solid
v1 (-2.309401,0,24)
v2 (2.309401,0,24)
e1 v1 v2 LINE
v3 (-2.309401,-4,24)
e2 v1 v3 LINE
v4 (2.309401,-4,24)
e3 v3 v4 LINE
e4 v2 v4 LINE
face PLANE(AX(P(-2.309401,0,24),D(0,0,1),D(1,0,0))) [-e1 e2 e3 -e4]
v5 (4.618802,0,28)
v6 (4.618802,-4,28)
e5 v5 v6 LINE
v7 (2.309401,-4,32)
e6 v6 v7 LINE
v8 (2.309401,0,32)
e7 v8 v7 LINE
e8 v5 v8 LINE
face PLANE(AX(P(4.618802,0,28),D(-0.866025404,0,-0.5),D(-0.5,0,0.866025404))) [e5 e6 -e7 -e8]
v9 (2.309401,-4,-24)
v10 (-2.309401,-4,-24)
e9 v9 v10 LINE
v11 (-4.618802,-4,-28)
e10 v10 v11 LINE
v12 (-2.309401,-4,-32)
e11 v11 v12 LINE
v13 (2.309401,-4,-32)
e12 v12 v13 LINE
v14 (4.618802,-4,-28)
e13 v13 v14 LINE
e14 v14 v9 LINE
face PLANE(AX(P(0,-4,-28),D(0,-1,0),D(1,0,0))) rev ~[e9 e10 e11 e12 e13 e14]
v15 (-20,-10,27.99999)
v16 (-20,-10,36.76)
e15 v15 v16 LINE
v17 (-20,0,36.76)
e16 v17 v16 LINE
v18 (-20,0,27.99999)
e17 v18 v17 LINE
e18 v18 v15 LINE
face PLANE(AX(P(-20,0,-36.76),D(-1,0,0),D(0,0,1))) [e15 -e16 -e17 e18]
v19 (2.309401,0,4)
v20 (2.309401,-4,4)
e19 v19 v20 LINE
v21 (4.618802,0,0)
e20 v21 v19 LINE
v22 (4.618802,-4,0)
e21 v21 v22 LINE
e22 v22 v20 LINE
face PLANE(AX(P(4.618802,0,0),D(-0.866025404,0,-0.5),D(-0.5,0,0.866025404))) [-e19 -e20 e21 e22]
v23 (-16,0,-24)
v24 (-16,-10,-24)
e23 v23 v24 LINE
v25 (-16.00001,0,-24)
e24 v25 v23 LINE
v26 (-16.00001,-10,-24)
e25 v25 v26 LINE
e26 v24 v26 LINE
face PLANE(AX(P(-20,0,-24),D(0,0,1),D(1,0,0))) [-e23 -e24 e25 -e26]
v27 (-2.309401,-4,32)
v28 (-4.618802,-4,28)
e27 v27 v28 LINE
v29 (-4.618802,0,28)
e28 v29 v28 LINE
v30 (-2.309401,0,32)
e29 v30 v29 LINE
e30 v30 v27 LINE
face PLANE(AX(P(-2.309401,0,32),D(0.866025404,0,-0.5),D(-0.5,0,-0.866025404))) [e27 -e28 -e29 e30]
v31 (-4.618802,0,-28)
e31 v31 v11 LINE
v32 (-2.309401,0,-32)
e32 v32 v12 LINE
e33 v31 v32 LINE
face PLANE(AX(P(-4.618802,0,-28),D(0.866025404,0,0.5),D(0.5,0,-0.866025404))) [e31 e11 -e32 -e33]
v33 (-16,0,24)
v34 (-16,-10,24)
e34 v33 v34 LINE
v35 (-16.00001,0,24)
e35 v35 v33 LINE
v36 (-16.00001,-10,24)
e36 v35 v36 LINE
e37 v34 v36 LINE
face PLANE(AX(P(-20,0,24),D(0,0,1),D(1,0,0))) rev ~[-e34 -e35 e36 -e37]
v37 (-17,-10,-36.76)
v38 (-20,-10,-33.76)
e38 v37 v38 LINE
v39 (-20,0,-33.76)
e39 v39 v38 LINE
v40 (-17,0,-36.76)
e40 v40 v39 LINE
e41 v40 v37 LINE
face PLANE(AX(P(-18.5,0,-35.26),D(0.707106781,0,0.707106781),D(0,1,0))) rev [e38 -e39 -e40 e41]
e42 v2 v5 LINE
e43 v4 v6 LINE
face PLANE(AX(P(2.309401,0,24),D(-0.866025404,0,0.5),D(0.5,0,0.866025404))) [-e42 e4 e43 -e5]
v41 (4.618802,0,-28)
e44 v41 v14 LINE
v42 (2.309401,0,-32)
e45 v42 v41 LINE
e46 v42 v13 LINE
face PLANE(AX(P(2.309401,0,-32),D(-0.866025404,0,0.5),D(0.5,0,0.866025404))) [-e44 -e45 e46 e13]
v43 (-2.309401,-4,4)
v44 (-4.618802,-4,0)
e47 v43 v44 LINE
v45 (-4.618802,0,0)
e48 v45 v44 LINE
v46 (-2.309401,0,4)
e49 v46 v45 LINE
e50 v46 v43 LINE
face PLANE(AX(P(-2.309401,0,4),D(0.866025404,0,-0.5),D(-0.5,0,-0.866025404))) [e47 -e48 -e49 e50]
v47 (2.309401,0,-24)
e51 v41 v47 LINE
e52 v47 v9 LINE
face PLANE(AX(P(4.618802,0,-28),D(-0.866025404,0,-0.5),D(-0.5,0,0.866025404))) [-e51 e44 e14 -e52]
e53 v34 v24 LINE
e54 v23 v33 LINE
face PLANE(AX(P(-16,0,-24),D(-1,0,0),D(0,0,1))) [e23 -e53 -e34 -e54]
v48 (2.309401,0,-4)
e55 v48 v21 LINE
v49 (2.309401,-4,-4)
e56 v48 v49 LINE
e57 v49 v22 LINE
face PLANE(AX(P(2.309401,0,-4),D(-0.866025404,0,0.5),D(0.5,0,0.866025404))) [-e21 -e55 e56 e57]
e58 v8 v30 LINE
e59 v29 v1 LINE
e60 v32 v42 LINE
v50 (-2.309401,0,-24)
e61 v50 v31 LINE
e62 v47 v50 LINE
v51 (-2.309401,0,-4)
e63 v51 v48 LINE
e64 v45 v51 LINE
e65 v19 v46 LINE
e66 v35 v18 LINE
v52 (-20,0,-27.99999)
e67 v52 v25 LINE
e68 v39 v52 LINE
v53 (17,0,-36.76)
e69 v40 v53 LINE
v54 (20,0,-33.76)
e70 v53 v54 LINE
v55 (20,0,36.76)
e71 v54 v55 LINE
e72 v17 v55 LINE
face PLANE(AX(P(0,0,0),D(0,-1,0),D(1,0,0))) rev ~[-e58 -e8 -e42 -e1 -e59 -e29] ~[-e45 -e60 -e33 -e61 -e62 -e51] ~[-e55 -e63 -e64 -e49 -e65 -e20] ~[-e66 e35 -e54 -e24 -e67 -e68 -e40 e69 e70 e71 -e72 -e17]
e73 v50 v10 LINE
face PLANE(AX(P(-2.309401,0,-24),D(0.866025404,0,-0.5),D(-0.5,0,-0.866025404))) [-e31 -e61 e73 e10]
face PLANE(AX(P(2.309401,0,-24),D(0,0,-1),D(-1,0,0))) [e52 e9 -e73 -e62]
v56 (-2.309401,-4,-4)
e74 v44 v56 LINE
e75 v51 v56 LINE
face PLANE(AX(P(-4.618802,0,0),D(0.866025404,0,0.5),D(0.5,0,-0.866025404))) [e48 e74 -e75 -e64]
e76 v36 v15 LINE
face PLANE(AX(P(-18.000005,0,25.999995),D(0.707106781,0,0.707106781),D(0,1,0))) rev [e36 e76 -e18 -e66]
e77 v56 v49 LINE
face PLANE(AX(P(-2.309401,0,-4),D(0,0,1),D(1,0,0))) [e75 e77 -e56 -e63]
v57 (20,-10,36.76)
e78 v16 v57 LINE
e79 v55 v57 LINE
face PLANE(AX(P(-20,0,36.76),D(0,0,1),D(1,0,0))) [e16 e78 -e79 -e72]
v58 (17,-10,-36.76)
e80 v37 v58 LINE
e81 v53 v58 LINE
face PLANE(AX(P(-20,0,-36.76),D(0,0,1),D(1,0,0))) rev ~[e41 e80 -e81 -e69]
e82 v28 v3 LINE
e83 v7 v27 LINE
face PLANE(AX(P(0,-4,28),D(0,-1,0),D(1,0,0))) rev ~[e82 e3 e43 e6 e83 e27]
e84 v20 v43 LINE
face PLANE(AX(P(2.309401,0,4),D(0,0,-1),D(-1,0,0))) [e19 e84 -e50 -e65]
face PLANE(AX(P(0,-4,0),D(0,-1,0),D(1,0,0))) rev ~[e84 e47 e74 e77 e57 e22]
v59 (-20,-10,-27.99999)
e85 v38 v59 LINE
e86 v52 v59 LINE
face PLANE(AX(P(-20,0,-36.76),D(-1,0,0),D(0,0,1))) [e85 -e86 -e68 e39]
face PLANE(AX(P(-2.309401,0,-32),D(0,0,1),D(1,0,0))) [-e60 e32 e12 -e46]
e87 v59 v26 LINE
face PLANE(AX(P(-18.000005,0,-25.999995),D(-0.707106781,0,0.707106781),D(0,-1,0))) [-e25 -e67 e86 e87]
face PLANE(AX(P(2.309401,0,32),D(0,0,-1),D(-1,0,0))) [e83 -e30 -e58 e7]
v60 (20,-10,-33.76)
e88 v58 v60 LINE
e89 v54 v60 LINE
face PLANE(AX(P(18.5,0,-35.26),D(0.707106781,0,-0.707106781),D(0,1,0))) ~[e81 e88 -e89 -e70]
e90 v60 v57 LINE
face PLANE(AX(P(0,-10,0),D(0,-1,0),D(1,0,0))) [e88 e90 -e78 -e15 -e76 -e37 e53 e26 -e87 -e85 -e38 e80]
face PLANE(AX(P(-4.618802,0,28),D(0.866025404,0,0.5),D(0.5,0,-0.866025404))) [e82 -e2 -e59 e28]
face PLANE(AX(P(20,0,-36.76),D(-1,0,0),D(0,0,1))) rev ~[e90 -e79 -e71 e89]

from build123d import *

# Parameters (mm, degrees)
F1_W     = 40
F1_H     = 73.52
F2_DEPTH = 10
F3_DEPTH = 4
F4_SIZE  = 3
F5_SIZE  = 3
F6_W     = 4
F6_H     = 48
F7_DEPTH = 25
F8_SIZE  = 3.99999


# Not quite as in the source:
# - a fillet or chamfer is up to 0.001 mm smaller than in the source, because OpenCascade refuses the exact size


with BuildPart() as f2:
    # F1 (on Front) → F2 (new body)
    with BuildSketch(Plane.XZ):
        Rectangle(F1_W, F1_H)
    extrude(amount=F2_DEPTH)

    # F0 (on Front) → F3 (cut)
    with BuildSketch(Plane.XZ):
        Polygon((2.3094010768, 4), (-2.3094010768, 4), (-4.6188021535, 0), (-2.3094010768, -4), (2.3094010768, -4), (4.6188021535, 0), align=None)
        Polygon((2.3094010768, 32), (-2.3094010768, 32), (-4.6188021535, 28), (-2.3094010768, 24), (2.3094010768, 24), (4.6188021535, 28), align=None)
        Polygon((2.3094010768, -24), (-2.3094010768, -24), (-4.6188021535, -28), (-2.3094010768, -32), (2.3094010768, -32), (4.6188021535, -28), align=None)
    extrude(amount=F3_DEPTH, mode=Mode.SUBTRACT)

    # F4
    f4_edges = [f2.edges().sort_by_distance(p)[0] for p in [
        (20, -5, -36.76),
    ]]
    chamfer(f4_edges, length=F4_SIZE)

    # F5
    f5_edges = [f2.edges().sort_by_distance(p)[0] for p in [
        (-20, -5, -36.76),
    ]]
    chamfer(f5_edges, length=F5_SIZE)

    # F6 (on Front) → F7 (cut)
    with BuildSketch(Plane.XZ):
        with Locations((-18, 0)):
            Rectangle(F6_W, F6_H)
    extrude(amount=F7_DEPTH, mode=Mode.SUBTRACT)

    # F8 (size 4 in the source; OpenCascade refuses exactly that, so slightly less here)
    f8_edges = [f2.edges().sort_by_distance(p)[0] for p in [
        (-20, -5, 24),
        (-20, -5, -24),
    ]]
    chamfer(f8_edges, length=F8_SIZE)


solid = f2.part
